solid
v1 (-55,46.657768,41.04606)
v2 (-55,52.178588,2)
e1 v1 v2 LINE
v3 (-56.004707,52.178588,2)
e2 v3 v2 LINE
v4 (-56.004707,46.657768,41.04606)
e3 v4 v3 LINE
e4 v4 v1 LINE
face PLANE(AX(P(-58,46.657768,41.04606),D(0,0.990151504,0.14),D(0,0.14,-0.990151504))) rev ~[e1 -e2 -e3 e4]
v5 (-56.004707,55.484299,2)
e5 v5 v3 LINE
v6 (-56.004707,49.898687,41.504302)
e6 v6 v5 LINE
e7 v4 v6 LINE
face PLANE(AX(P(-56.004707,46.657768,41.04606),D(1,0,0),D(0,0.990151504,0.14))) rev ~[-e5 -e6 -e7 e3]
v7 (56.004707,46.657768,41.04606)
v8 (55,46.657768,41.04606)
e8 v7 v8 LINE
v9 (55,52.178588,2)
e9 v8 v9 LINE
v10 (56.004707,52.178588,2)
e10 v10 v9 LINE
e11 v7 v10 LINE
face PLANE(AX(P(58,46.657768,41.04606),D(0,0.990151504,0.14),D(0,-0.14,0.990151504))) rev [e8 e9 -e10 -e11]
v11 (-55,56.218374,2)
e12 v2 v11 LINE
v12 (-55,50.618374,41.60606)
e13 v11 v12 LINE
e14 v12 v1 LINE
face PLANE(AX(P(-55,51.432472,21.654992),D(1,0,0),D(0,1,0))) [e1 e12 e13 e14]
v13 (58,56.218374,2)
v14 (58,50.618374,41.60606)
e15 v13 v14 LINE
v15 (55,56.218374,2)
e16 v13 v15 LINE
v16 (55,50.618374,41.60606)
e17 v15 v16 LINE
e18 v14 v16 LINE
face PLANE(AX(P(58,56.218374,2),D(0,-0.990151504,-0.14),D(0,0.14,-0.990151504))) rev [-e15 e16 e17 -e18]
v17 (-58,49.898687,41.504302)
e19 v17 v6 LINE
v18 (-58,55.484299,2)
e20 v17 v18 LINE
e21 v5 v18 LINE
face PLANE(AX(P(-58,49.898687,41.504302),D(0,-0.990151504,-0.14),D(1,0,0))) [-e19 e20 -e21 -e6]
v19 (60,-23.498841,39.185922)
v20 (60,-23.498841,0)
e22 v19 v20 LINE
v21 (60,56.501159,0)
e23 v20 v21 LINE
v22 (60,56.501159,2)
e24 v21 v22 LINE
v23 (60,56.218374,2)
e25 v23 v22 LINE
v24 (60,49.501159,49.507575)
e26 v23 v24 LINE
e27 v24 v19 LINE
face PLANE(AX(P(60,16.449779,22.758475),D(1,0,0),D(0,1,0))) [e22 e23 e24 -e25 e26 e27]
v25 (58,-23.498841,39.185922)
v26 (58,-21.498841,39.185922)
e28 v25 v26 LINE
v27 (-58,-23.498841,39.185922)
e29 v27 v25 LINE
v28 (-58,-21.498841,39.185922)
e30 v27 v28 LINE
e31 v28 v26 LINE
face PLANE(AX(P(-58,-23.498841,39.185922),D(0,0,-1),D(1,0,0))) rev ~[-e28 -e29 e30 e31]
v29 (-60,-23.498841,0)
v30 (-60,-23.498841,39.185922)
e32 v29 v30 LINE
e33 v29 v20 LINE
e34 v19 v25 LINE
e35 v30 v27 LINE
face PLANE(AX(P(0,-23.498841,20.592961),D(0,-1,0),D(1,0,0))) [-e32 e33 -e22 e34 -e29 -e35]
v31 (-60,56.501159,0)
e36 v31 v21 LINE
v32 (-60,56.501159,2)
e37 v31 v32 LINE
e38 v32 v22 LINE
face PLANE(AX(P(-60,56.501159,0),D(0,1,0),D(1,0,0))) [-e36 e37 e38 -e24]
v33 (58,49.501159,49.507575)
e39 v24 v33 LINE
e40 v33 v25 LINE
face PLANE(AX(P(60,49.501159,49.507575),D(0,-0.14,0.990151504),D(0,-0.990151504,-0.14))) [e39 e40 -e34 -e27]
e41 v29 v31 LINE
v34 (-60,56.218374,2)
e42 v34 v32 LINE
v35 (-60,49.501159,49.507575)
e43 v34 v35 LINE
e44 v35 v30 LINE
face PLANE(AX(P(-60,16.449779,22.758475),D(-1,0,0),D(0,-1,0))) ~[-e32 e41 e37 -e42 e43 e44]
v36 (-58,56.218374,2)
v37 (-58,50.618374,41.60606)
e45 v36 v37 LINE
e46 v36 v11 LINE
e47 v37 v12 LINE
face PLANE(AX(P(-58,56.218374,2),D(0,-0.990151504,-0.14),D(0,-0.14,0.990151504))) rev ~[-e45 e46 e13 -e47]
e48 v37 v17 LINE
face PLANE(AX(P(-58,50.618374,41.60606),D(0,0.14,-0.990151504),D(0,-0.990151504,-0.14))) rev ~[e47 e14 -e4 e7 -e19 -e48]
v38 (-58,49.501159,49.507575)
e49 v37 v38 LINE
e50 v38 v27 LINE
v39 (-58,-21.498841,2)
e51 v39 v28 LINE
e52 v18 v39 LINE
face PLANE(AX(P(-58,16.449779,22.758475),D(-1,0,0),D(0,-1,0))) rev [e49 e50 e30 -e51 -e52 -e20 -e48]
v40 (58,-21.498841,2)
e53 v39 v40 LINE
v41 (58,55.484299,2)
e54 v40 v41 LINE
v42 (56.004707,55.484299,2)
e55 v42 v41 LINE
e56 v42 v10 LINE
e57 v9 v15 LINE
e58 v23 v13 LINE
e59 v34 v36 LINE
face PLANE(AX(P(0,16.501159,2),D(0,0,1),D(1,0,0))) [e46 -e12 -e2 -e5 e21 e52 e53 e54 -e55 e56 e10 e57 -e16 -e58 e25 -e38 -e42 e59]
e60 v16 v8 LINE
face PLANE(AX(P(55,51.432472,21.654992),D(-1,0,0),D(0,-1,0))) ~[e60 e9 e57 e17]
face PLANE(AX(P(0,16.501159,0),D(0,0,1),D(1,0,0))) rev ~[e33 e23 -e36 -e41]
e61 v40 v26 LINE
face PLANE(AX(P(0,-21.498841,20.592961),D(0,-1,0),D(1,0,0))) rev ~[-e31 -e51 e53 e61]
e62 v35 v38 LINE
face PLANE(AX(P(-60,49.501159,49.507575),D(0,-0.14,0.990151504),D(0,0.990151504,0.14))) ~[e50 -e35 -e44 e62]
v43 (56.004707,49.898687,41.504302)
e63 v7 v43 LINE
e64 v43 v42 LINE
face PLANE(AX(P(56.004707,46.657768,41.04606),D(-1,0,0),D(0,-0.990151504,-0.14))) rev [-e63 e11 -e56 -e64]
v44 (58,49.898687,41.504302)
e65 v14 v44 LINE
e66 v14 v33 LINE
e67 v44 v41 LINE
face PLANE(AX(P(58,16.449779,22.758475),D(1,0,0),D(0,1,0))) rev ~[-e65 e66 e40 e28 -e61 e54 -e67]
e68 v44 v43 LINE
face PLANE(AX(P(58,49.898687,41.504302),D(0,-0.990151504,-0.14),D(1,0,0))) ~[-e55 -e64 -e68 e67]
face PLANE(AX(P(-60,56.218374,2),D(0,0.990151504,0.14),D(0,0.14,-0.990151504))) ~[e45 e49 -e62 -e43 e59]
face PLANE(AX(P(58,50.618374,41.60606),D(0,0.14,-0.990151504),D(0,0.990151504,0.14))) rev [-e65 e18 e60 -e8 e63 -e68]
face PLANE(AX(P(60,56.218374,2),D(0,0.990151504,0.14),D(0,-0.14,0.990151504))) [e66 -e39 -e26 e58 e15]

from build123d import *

# Parameters (mm, degrees)
F0_W      = 120
F0_H      = 80
F1_DEPTH  = 2
F3_DEPTH  = 2
F5_W      = 116
F5_H      = 37.1859224175
F6_DEPTH  = 2
F8_DEPTH  = 3
F9_W      = 1.9952932298
F9_H      = 3.2731545162
F10_REACH = 45.8542642129


with BuildPart() as f1:
    # F0 (on Top) → F1 (new body)
    with BuildSketch(Plane.XY):
        with Locations((0, 16.5011590771)):
            Rectangle(F0_W, F0_H)
    extrude(amount=F1_DEPTH)

    # F2 (on face) → F3 (join)
    with BuildSketch(Plane.YZ.offset(60)):
        Polygon((-23.4988409229, 2), (56.2183740699, 2), (49.5011590771, 49.5075751779), (-23.4988409229, 39.1859224175), align=None)
    extrude(amount=-F3_DEPTH)

    # F4: F1 across plane


with BuildPart() as f1_1:
    add(f1.part)
    add(f1.part.mirror(Plane.YZ))

    # F5 (on face) → F6 (join)
    with BuildSketch(Plane.XZ.offset(23.4988409229)):
        with Locations((0, 20.5929612087)):
            Rectangle(F5_W, F5_H)
    extrude(amount=-F6_DEPTH)

    # F7 (on face) → F8 (join)
    with BuildSketch(Plane.YZ.offset(-58)):
        Polygon((52.1785882537, 2), (56.2183740699, 2), (50.6183740699, 41.6060601424), (46.6577680557, 41.0460601424), align=None)
    extrude(amount=F8_DEPTH)

    f10_end = Plane(origin=(0.0757710305, 17.4568088596, 2), x_dir=(1, 0, 0), z_dir=(0, 0, 1))
    # F9 (on face) → F10 (cut, up to a plane its end follows)
    with BuildSketch(Plane(origin=(0, -4.7753622892, 33.7738010765), x_dir=(1, 0, 0), z_dir=(0, -0.14, 0.9901515036))):
        with Locations((-57.0023533851, 53.5812848711)):
            Rectangle(F9_W, F9_H)
    f10_long = extrude(amount=-F10_REACH, mode=Mode.PRIVATE)
    add(split(f10_long, bisect_by=f10_end, keep=Keep.TOP, mode=Mode.PRIVATE), mode=Mode.SUBTRACT)

    # F11: F1 across plane


with BuildPart() as f1_2:
    add(f1_1.part)
    add(f1_1.part.mirror(Plane.YZ))


solid = f1_2.part
